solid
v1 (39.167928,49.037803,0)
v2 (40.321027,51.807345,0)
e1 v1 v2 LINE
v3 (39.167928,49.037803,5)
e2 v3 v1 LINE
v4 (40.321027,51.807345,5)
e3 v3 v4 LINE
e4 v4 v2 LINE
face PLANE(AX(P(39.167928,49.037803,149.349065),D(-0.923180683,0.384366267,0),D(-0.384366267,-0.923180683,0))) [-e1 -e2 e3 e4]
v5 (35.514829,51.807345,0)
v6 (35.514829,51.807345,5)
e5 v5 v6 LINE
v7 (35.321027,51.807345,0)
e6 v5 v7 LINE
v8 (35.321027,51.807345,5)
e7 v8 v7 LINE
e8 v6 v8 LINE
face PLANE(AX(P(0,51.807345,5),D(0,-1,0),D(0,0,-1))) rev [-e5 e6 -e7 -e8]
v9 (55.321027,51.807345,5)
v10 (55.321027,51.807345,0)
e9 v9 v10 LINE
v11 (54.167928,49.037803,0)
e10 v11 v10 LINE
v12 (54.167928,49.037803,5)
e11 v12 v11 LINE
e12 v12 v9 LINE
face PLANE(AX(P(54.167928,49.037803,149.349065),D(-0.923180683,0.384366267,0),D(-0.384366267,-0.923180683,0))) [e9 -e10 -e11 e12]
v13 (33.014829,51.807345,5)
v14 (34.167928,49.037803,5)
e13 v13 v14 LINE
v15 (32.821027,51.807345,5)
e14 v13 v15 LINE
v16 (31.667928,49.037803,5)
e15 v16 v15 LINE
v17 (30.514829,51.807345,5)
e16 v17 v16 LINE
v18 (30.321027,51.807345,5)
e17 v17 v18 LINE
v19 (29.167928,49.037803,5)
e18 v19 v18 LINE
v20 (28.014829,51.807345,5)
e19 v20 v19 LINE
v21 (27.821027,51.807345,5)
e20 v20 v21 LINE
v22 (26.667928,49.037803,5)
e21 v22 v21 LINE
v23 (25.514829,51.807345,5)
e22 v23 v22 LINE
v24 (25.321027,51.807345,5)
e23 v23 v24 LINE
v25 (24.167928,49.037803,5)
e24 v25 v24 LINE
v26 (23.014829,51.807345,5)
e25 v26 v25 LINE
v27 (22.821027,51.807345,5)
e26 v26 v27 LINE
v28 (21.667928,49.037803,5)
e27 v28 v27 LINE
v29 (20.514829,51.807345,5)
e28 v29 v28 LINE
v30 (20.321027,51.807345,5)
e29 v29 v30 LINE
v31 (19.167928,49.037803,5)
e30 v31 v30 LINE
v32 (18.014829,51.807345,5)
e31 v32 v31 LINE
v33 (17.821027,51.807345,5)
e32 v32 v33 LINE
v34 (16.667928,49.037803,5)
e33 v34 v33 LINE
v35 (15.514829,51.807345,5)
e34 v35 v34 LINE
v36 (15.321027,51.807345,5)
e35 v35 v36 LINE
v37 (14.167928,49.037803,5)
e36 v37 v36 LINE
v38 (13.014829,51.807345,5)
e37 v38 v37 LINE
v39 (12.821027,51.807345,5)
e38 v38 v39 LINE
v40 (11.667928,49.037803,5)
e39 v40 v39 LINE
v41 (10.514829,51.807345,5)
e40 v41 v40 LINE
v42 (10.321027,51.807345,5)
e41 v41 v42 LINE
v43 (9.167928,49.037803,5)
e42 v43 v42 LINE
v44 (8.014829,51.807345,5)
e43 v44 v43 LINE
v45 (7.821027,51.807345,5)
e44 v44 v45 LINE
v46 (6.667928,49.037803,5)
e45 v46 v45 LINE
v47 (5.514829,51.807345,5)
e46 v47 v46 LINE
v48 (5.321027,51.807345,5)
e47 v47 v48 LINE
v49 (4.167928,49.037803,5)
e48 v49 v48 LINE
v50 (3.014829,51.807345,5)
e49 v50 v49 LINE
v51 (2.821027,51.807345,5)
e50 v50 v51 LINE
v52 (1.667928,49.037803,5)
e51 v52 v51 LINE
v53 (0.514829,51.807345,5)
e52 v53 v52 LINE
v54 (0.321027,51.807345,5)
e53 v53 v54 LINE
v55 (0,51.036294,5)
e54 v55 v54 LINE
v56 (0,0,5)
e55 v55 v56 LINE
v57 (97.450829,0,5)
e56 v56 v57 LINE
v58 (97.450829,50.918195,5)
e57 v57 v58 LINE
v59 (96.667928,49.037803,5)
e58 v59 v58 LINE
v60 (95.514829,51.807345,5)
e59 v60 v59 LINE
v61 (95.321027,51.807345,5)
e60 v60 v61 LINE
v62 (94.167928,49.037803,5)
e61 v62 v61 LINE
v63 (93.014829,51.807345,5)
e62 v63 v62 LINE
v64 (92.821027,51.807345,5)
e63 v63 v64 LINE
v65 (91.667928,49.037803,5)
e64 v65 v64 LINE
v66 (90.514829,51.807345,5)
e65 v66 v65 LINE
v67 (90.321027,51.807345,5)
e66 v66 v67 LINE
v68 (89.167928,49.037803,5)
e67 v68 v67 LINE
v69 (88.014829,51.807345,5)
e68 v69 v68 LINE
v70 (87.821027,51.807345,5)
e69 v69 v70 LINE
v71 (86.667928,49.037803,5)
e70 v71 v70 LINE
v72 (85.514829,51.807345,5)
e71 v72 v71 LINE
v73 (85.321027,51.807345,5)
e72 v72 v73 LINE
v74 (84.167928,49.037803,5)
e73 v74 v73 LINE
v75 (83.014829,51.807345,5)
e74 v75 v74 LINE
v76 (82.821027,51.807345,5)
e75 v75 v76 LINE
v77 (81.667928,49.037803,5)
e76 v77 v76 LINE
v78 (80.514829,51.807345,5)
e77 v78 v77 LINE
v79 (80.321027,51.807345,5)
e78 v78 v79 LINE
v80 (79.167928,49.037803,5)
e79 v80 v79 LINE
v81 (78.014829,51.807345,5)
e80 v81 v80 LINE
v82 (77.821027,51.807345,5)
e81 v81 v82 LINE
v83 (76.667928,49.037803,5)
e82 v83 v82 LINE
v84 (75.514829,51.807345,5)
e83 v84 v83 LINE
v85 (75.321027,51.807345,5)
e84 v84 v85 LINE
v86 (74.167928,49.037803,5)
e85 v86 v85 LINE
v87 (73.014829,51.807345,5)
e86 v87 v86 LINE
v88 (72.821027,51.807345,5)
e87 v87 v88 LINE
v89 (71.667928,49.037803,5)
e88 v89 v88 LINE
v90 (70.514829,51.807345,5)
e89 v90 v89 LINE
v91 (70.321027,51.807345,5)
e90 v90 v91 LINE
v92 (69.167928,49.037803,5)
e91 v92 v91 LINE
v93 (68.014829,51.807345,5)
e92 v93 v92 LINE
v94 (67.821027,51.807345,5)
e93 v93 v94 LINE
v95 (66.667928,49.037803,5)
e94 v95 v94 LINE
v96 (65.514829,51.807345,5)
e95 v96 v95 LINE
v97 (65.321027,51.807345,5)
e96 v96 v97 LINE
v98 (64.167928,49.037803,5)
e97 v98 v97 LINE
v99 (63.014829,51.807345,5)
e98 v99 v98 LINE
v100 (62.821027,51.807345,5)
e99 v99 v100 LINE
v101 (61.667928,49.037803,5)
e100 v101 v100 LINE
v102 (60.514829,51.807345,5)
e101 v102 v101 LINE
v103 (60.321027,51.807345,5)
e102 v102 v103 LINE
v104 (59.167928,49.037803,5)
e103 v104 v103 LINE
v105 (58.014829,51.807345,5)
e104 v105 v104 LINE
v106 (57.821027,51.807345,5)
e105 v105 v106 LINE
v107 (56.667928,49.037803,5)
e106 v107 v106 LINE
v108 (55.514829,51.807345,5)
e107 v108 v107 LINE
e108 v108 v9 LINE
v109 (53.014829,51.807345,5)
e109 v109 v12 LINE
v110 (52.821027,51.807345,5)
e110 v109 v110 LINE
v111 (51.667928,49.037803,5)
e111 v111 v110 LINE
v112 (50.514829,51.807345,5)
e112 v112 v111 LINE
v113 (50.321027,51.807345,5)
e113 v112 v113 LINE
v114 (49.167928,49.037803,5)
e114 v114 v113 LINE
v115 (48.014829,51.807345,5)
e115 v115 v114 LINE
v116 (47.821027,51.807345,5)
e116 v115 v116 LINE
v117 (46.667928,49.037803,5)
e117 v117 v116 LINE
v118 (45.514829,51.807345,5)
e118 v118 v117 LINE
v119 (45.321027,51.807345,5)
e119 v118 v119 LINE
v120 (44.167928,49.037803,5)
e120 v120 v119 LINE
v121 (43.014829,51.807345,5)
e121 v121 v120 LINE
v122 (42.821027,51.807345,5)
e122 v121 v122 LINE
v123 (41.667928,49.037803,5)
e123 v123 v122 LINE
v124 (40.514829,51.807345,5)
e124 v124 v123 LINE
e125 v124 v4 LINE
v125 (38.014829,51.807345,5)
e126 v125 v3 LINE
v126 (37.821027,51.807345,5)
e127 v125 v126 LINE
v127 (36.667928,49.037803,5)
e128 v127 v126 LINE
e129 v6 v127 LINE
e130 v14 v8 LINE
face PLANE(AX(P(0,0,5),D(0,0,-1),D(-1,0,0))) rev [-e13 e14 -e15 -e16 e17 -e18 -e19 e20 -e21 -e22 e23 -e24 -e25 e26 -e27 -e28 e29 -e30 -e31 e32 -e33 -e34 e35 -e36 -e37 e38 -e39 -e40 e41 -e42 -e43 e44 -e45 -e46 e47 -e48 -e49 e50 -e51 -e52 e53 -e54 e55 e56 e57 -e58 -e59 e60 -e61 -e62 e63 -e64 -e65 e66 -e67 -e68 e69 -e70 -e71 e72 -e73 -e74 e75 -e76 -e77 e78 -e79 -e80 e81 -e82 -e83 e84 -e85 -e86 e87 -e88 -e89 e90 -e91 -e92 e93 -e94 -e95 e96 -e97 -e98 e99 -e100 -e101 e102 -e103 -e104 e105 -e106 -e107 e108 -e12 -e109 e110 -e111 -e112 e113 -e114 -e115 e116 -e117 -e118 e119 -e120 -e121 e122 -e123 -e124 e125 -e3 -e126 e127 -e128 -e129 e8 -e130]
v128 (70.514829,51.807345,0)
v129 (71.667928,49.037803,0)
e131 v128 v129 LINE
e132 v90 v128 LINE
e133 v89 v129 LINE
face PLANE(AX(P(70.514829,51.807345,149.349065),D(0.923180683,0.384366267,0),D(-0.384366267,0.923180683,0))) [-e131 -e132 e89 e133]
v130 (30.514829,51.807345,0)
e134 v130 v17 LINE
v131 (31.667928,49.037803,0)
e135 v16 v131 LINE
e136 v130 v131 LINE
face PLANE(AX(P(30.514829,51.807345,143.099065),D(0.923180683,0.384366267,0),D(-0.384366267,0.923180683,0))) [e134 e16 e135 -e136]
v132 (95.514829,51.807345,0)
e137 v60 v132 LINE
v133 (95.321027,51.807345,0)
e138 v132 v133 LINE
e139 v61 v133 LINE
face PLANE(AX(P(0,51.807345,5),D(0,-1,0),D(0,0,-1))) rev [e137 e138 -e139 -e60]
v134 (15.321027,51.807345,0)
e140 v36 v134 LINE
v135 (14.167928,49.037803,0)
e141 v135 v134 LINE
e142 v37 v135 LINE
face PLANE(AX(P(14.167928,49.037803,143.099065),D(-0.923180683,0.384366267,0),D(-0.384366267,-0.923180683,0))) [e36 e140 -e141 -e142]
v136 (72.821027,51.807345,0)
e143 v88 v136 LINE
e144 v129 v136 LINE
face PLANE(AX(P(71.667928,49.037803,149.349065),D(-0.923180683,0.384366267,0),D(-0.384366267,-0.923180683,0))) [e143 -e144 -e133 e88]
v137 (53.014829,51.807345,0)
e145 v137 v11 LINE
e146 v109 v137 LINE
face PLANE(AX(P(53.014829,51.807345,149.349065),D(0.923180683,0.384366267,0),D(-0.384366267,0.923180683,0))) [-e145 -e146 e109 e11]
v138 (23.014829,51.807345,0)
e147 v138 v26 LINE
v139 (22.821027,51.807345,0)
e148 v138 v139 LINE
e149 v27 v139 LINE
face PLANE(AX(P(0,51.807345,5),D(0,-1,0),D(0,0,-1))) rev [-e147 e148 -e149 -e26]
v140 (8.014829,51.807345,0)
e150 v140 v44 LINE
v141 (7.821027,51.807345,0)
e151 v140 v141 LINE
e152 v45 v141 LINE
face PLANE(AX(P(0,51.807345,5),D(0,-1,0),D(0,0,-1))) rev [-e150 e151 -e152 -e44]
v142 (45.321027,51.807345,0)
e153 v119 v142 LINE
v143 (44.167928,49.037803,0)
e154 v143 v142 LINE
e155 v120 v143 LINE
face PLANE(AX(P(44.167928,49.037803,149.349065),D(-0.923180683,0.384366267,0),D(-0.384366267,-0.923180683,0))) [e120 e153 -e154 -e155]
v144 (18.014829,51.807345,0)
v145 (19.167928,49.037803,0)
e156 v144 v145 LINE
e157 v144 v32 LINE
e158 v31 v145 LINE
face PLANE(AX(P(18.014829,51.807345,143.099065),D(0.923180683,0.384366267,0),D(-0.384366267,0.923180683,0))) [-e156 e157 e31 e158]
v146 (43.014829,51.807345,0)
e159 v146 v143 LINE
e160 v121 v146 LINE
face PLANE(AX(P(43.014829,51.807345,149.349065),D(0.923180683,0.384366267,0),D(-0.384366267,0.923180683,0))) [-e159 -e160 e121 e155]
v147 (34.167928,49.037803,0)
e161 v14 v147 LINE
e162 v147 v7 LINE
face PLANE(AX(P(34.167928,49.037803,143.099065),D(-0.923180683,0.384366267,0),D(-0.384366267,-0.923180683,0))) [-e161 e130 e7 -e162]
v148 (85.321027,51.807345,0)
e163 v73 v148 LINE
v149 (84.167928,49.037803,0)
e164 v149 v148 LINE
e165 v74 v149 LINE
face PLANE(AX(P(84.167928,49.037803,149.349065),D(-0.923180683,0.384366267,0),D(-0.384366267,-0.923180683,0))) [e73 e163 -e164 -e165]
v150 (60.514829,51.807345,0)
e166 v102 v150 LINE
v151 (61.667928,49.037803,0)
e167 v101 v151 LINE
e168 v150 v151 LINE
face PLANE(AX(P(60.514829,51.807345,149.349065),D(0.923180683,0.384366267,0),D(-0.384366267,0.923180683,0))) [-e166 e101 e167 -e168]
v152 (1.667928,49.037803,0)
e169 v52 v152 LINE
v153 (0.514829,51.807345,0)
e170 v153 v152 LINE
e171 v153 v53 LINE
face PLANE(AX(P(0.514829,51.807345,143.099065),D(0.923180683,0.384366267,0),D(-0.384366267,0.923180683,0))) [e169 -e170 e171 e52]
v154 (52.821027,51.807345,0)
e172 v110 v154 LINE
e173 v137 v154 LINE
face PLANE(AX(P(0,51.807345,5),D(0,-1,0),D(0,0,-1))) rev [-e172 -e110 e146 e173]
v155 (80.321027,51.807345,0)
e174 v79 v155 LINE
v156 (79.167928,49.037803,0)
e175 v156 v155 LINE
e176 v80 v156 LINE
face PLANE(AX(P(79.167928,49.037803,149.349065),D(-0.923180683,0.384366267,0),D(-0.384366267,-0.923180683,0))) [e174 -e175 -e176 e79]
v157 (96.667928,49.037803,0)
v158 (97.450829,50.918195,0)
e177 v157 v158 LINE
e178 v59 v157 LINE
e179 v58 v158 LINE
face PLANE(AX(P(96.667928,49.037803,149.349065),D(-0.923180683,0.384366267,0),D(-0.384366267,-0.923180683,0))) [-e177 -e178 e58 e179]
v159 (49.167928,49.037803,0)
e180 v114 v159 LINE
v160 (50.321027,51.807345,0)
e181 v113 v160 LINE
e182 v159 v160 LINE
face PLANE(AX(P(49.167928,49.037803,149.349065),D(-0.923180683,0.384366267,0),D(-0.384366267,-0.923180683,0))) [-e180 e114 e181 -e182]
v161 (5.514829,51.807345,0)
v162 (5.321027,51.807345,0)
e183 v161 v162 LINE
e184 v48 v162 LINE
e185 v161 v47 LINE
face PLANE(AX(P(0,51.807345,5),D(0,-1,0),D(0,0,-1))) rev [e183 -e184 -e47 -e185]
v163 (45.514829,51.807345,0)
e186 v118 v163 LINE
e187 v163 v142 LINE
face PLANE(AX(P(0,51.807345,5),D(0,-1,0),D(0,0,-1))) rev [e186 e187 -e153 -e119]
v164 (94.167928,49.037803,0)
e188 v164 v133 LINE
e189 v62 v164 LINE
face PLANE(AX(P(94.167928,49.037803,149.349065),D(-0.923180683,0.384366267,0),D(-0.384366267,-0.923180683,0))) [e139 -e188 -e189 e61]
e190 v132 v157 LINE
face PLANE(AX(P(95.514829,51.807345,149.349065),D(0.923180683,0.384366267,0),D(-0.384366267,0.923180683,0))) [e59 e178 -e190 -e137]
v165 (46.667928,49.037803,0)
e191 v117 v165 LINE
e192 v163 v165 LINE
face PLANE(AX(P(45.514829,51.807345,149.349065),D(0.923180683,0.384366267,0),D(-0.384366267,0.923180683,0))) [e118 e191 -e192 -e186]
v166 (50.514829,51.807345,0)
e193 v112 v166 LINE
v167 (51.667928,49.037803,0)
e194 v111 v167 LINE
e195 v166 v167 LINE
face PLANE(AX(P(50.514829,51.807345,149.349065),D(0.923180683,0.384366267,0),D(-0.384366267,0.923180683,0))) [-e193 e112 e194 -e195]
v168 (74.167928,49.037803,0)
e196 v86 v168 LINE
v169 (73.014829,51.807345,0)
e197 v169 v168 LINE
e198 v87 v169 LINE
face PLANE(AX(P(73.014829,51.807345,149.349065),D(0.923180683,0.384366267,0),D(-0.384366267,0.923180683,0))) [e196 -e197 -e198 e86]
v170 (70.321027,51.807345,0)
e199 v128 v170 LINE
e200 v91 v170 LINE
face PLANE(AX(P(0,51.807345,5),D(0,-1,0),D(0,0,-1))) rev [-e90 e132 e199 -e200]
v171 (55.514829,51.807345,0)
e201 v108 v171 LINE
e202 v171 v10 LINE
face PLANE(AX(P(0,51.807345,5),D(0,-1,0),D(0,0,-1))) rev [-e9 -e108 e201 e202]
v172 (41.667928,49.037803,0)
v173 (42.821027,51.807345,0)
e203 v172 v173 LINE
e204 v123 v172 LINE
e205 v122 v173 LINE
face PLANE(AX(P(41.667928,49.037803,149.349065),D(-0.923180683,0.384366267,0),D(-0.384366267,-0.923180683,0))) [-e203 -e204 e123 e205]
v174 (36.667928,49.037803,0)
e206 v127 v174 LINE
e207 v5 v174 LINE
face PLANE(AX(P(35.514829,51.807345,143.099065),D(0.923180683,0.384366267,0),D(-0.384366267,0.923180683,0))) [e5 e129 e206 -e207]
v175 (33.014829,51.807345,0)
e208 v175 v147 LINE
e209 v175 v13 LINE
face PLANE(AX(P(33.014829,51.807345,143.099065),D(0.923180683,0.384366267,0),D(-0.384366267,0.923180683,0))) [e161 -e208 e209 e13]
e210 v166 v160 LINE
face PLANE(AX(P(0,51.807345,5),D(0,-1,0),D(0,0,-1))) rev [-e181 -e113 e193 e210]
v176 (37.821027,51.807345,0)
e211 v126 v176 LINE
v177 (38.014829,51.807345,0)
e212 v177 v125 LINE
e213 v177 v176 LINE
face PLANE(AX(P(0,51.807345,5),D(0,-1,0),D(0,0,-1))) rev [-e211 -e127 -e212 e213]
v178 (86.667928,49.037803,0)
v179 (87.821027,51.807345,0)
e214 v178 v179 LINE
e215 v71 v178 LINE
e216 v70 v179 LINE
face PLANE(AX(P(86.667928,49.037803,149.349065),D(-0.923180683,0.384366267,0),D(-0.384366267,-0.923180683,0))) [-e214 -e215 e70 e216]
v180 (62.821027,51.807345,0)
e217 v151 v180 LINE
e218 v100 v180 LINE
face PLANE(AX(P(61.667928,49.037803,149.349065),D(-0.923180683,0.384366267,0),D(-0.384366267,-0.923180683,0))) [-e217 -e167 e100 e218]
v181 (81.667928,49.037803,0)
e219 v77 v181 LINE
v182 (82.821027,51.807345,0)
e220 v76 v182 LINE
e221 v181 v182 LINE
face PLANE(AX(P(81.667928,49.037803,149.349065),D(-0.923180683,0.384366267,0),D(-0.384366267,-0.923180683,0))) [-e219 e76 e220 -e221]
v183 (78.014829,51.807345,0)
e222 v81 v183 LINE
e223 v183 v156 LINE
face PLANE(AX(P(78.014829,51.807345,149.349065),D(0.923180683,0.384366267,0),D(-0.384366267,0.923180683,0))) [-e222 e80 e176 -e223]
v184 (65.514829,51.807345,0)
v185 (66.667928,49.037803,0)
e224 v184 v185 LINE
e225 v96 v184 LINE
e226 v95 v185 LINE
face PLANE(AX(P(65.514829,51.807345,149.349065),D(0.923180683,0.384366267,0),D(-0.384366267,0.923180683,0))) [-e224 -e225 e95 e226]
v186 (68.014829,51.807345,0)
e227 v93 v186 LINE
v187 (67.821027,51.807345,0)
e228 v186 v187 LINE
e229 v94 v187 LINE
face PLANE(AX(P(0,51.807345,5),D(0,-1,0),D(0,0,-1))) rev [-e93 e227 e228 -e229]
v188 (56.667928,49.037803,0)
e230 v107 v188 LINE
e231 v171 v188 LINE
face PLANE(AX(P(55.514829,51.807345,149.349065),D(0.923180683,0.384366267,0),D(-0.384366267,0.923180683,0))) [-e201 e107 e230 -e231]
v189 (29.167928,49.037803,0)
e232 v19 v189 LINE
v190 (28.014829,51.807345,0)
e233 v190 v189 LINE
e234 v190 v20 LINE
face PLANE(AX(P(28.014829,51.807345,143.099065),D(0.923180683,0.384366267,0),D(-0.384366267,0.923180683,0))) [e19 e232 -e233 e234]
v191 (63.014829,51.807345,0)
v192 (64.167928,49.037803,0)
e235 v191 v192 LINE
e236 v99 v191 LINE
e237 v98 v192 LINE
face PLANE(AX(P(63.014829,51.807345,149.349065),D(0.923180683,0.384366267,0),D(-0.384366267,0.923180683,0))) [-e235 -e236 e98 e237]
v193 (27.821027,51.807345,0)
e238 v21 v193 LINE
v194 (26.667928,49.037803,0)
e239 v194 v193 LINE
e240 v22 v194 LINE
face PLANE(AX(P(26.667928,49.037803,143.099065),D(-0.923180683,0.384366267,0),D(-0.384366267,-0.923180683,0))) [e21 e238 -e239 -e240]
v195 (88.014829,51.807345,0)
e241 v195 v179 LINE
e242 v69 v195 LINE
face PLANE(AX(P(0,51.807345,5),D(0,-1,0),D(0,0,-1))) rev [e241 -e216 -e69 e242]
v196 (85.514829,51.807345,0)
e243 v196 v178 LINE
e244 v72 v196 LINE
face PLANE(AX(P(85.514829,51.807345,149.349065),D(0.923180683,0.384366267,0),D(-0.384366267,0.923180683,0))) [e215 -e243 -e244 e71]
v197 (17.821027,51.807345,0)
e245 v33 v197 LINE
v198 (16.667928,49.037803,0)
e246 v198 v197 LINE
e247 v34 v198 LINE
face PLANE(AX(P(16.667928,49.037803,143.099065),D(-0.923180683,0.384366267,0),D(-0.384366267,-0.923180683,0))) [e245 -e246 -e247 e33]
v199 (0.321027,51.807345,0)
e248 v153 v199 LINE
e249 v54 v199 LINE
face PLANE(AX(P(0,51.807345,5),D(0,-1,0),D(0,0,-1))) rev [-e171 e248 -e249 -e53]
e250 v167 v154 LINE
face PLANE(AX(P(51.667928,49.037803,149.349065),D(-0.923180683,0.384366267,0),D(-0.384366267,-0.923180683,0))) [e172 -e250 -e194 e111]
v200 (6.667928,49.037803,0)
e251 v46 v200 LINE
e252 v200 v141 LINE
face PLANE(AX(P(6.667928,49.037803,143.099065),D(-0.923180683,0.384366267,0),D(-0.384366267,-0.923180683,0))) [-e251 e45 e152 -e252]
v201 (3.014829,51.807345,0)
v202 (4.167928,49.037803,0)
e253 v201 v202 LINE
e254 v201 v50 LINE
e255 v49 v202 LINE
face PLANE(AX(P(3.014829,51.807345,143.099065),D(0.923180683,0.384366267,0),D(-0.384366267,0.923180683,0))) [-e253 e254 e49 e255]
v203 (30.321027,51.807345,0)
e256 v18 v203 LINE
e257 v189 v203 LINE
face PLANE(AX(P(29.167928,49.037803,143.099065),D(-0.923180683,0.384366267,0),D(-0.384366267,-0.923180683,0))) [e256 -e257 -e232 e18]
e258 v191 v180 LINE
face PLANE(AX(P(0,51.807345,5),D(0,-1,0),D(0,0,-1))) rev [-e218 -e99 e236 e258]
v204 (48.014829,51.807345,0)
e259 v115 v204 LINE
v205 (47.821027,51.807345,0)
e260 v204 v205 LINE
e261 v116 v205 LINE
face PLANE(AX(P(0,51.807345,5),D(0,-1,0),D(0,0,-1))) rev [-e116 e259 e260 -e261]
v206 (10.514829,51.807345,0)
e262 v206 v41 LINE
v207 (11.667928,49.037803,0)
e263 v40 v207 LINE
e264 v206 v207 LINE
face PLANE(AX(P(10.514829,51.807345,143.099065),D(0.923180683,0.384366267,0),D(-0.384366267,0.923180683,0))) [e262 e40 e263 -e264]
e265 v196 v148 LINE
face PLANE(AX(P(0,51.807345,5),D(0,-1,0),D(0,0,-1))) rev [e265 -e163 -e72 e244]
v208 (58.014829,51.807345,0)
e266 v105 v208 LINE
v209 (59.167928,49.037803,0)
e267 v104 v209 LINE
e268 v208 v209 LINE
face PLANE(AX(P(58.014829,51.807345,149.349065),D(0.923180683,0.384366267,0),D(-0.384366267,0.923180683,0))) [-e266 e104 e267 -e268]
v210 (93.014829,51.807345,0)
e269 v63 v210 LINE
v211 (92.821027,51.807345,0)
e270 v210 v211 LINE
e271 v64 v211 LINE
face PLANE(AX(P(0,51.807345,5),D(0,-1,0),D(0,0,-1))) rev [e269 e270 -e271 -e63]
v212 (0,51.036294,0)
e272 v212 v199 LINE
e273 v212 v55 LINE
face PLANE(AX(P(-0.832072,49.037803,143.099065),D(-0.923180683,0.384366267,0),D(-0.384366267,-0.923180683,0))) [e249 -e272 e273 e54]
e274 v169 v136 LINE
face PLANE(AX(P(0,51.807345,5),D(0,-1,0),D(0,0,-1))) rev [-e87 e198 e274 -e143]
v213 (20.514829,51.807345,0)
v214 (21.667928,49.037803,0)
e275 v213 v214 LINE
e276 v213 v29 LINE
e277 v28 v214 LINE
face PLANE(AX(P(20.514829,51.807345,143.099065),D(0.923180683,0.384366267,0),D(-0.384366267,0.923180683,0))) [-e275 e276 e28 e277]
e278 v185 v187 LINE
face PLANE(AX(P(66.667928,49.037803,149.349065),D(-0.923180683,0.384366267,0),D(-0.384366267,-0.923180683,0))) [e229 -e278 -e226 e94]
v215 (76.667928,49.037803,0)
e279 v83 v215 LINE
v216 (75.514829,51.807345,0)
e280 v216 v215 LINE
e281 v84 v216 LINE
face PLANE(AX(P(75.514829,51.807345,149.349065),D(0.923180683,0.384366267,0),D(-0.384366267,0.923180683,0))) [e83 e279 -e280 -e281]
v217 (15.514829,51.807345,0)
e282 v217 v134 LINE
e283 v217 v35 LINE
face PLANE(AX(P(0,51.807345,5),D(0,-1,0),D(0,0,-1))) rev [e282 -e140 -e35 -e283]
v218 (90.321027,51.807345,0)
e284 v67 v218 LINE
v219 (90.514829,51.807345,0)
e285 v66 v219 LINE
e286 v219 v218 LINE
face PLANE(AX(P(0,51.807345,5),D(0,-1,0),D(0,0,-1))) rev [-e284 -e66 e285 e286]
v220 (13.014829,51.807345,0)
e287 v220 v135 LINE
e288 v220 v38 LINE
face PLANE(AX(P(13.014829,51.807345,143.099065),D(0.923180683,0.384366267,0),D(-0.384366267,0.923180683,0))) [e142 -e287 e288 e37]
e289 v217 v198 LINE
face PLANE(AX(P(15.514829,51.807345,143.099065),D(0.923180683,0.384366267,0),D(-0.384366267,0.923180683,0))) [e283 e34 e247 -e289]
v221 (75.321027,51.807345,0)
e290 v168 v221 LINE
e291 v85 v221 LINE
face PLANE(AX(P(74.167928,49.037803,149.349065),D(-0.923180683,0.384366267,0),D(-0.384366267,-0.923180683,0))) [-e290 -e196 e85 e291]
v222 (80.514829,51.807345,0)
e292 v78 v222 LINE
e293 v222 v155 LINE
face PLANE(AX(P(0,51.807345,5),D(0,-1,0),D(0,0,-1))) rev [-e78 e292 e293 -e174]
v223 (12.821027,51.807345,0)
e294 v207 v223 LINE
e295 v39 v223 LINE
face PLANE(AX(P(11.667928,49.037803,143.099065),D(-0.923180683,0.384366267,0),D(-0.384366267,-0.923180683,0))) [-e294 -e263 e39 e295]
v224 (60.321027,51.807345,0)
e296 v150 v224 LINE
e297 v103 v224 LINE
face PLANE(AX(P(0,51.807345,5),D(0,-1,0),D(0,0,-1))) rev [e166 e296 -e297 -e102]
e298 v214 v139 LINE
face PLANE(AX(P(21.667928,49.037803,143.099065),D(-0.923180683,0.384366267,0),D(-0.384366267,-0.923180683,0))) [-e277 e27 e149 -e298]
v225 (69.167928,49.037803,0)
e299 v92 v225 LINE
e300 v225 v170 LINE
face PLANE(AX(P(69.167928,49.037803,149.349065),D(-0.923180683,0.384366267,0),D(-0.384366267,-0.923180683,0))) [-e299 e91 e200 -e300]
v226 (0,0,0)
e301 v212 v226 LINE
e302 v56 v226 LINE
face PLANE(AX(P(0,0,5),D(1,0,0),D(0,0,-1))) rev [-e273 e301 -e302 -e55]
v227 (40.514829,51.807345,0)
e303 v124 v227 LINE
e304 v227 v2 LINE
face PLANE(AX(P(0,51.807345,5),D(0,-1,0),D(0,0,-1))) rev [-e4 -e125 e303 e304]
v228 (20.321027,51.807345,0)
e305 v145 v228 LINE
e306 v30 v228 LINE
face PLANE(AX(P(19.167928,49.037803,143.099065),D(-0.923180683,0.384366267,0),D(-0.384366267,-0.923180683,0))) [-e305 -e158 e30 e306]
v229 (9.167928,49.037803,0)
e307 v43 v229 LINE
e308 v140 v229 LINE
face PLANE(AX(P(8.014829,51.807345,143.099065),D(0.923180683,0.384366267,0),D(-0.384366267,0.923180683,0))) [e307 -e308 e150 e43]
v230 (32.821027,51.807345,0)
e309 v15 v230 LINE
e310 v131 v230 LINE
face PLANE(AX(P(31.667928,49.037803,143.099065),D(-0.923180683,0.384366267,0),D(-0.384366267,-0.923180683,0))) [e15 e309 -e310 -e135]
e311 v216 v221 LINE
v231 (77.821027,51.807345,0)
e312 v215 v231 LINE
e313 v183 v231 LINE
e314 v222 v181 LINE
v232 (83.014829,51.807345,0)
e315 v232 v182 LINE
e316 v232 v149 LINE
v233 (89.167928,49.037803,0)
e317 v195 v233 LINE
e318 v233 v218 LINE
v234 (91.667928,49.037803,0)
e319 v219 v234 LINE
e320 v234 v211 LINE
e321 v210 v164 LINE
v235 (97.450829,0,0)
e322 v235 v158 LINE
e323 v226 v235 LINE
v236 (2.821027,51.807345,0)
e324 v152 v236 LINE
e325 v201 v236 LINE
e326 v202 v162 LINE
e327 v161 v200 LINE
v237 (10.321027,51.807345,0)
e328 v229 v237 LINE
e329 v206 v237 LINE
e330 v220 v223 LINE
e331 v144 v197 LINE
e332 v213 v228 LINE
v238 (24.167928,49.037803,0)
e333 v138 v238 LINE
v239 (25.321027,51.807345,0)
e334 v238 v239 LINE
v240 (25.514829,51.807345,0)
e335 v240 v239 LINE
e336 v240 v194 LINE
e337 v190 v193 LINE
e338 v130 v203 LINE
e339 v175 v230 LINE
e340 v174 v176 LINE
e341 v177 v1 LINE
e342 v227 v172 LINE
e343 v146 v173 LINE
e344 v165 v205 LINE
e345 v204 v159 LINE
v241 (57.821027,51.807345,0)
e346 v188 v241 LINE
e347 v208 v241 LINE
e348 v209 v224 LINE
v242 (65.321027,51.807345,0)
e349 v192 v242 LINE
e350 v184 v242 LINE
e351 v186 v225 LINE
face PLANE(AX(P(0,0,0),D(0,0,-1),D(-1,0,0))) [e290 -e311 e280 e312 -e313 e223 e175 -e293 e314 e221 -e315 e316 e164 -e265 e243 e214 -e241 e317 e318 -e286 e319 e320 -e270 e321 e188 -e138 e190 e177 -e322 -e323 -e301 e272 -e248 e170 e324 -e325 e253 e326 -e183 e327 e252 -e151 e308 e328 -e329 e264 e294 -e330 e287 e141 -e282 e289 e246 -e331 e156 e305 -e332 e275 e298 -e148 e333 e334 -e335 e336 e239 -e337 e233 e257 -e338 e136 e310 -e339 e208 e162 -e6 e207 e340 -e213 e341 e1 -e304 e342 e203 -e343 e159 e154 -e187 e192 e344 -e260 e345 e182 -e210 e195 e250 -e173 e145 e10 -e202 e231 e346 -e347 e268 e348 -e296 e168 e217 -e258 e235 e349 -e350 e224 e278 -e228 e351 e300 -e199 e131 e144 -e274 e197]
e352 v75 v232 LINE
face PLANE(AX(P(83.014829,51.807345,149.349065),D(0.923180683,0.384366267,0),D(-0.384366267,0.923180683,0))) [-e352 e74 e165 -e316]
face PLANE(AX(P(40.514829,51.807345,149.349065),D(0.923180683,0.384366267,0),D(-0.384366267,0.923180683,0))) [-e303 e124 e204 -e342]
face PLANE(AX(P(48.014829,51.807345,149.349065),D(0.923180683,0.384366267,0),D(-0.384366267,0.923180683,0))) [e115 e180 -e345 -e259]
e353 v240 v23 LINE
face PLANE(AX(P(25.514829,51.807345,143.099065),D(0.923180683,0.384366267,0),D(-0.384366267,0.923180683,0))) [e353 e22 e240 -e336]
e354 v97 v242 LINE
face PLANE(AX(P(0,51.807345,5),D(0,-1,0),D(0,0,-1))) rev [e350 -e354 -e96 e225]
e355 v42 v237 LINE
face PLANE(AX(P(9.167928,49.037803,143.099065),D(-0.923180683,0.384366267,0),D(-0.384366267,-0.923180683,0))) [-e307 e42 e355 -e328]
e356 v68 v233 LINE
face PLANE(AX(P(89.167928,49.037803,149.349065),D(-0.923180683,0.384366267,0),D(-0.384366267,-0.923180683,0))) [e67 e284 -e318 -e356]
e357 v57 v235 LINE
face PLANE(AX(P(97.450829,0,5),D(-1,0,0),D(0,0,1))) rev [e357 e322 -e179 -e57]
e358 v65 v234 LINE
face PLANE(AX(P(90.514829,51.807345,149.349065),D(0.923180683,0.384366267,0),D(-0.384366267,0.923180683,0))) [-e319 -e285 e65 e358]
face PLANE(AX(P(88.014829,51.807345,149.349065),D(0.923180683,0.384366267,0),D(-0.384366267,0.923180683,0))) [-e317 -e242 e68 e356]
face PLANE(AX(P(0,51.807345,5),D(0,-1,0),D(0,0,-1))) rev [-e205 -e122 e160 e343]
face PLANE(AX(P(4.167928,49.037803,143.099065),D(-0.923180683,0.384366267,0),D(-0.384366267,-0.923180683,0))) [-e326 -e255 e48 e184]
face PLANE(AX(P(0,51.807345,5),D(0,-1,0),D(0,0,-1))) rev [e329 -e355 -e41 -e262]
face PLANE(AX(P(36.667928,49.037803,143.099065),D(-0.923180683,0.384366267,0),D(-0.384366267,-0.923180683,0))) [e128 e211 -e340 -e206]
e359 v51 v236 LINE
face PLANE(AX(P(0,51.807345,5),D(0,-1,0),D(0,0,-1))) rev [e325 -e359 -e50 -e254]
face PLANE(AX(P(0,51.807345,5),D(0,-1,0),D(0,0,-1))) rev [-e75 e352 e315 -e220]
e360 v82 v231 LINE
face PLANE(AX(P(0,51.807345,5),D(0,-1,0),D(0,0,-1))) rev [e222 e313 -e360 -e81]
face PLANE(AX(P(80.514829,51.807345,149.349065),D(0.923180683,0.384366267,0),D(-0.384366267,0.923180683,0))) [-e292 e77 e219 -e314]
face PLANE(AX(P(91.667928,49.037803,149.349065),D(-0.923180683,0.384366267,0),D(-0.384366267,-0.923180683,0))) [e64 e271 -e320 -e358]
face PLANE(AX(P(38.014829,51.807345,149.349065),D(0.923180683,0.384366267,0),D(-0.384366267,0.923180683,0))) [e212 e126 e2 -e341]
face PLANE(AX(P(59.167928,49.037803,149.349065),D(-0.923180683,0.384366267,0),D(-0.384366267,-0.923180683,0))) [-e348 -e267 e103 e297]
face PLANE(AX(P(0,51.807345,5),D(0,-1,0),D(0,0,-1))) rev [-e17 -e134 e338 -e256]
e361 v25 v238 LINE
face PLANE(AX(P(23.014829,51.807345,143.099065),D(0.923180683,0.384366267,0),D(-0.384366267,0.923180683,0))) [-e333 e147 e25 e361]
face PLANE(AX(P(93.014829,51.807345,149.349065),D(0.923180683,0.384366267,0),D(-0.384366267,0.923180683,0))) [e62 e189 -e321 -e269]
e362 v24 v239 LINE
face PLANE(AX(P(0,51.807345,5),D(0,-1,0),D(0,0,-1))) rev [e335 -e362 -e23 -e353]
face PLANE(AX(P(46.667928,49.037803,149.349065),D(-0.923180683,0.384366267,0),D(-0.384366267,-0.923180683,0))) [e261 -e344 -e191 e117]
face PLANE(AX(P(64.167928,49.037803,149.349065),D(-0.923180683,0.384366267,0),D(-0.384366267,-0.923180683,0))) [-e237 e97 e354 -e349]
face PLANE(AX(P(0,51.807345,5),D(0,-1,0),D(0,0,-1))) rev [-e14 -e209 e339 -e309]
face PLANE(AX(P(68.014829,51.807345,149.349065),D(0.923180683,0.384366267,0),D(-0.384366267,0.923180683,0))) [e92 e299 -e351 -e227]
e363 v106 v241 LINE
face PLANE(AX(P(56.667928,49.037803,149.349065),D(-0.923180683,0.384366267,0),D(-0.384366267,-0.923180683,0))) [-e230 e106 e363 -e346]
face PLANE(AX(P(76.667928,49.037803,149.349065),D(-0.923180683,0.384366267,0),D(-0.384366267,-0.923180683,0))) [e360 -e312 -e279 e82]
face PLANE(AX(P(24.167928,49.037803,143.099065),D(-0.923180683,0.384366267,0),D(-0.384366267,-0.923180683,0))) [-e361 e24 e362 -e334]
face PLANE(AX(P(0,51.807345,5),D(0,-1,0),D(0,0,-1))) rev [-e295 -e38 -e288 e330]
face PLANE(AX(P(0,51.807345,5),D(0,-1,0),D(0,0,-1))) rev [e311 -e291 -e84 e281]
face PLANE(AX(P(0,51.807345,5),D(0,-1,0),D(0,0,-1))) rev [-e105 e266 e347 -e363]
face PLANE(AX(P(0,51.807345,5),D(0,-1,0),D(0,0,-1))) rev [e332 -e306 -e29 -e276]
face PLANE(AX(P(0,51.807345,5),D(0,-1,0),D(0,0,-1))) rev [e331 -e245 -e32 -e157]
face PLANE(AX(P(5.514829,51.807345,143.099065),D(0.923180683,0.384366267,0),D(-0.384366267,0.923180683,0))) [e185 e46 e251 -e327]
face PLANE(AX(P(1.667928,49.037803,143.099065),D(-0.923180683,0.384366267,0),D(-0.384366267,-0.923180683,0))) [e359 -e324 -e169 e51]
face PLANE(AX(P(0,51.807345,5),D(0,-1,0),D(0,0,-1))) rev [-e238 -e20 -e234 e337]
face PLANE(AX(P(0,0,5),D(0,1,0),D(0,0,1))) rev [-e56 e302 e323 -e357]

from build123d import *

# Parameters (mm, degrees)
SKETCH9_W           = 97.4508292
SKETCH9_H           = 51.807344848
BOSS_EXTRUDE3_DEPTH = 5
CUT_EXTRUDE9_DEPTH  = 111.479251862
LPATTERN1_COUNT     = 23
LPATTERN1_PITCH     = 2.5
LPATTERN2_DEPTH     = 5


# Read off the part's stored shape, not the designer's step: LPattern2
with BuildPart() as part:
    # Sketch9 → Boss-Extrude3 (new body)
    with BuildSketch(Plane.XY):
        with Locations((48.7254146, 25.903672424)):
            Rectangle(SKETCH9_W, SKETCH9_H)
    extrude(amount=BOSS_EXTRUDE3_DEPTH)

    # Sketch13 → Cut-Extrude9 (cut, symmetric)
    with BuildSketch(Plane.XY.offset(5)):
        Polygon((-22.504808693, 203.169515117), (40.514829285, 51.807344848), (41.667928087, 49.037802801), (42.821026889, 51.807344848), (105.840664868, 203.169515117), (105.840664868, 531.084024461), (-22.504808693, 531.084024461), align=None)
    cut_extrude9 = extrude(amount=CUT_EXTRUDE9_DEPTH, both=True, mode=Mode.SUBTRACT)

    # LPattern1: Cut-Extrude9 ×23
    with Locations(*[(i * LPATTERN1_PITCH, 0, 0) for i in range(1, LPATTERN1_COUNT)]):
        add(cut_extrude9, mode=Mode.SUBTRACT)

    # LPattern2 outline → LPattern2 (cut)
    with BuildSketch(Plane.XY):
        Polygon((0, 51.036294296), (0.321026889, 51.807344848), (0, 51.807344848), align=None)
        Polygon((1.667928087, 49.037802801), (2.821026889, 51.807344848), (0.514829285, 51.807344848), align=None)
        Polygon((4.167928087, 49.037802801), (5.321026889, 51.807344848), (3.014829285, 51.807344848), align=None)
        Polygon((6.667928087, 49.037802801), (7.821026889, 51.807344848), (5.514829285, 51.807344848), align=None)
        Polygon((9.167928087, 49.037802801), (10.321026889, 51.807344848), (8.014829285, 51.807344848), align=None)
        Polygon((11.667928087, 49.037802801), (12.821026889, 51.807344848), (10.514829285, 51.807344848), align=None)
        Polygon((14.167928087, 49.037802801), (15.321026889, 51.807344848), (13.014829285, 51.807344848), align=None)
        Polygon((16.667928087, 49.037802801), (17.821026889, 51.807344848), (15.514829285, 51.807344848), align=None)
        Polygon((19.167928087, 49.037802801), (20.321026889, 51.807344848), (18.014829285, 51.807344848), align=None)
        Polygon((21.667928087, 49.037802801), (22.821026889, 51.807344848), (20.514829285, 51.807344848), align=None)
        Polygon((24.167928087, 49.037802801), (25.321026889, 51.807344848), (23.014829285, 51.807344848), align=None)
        Polygon((26.667928087, 49.037802801), (27.821026889, 51.807344848), (25.514829285, 51.807344848), align=None)
        Polygon((29.167928087, 49.037802801), (30.321026889, 51.807344848), (28.014829285, 51.807344848), align=None)
        Polygon((31.667928087, 49.037802801), (32.821026889, 51.807344848), (30.514829285, 51.807344848), align=None)
        Polygon((34.167928087, 49.037802801), (35.321026889, 51.807344848), (33.014829285, 51.807344848), align=None)
        Polygon((36.667928087, 49.037802801), (37.821026889, 51.807344848), (35.514829285, 51.807344848), align=None)
        Polygon((38.014829285, 51.807344848), (39.167928087, 49.037802801), (40.321026889, 51.807344848), align=None)
    extrude(amount=LPATTERN2_DEPTH, mode=Mode.SUBTRACT)


solid = part.part
